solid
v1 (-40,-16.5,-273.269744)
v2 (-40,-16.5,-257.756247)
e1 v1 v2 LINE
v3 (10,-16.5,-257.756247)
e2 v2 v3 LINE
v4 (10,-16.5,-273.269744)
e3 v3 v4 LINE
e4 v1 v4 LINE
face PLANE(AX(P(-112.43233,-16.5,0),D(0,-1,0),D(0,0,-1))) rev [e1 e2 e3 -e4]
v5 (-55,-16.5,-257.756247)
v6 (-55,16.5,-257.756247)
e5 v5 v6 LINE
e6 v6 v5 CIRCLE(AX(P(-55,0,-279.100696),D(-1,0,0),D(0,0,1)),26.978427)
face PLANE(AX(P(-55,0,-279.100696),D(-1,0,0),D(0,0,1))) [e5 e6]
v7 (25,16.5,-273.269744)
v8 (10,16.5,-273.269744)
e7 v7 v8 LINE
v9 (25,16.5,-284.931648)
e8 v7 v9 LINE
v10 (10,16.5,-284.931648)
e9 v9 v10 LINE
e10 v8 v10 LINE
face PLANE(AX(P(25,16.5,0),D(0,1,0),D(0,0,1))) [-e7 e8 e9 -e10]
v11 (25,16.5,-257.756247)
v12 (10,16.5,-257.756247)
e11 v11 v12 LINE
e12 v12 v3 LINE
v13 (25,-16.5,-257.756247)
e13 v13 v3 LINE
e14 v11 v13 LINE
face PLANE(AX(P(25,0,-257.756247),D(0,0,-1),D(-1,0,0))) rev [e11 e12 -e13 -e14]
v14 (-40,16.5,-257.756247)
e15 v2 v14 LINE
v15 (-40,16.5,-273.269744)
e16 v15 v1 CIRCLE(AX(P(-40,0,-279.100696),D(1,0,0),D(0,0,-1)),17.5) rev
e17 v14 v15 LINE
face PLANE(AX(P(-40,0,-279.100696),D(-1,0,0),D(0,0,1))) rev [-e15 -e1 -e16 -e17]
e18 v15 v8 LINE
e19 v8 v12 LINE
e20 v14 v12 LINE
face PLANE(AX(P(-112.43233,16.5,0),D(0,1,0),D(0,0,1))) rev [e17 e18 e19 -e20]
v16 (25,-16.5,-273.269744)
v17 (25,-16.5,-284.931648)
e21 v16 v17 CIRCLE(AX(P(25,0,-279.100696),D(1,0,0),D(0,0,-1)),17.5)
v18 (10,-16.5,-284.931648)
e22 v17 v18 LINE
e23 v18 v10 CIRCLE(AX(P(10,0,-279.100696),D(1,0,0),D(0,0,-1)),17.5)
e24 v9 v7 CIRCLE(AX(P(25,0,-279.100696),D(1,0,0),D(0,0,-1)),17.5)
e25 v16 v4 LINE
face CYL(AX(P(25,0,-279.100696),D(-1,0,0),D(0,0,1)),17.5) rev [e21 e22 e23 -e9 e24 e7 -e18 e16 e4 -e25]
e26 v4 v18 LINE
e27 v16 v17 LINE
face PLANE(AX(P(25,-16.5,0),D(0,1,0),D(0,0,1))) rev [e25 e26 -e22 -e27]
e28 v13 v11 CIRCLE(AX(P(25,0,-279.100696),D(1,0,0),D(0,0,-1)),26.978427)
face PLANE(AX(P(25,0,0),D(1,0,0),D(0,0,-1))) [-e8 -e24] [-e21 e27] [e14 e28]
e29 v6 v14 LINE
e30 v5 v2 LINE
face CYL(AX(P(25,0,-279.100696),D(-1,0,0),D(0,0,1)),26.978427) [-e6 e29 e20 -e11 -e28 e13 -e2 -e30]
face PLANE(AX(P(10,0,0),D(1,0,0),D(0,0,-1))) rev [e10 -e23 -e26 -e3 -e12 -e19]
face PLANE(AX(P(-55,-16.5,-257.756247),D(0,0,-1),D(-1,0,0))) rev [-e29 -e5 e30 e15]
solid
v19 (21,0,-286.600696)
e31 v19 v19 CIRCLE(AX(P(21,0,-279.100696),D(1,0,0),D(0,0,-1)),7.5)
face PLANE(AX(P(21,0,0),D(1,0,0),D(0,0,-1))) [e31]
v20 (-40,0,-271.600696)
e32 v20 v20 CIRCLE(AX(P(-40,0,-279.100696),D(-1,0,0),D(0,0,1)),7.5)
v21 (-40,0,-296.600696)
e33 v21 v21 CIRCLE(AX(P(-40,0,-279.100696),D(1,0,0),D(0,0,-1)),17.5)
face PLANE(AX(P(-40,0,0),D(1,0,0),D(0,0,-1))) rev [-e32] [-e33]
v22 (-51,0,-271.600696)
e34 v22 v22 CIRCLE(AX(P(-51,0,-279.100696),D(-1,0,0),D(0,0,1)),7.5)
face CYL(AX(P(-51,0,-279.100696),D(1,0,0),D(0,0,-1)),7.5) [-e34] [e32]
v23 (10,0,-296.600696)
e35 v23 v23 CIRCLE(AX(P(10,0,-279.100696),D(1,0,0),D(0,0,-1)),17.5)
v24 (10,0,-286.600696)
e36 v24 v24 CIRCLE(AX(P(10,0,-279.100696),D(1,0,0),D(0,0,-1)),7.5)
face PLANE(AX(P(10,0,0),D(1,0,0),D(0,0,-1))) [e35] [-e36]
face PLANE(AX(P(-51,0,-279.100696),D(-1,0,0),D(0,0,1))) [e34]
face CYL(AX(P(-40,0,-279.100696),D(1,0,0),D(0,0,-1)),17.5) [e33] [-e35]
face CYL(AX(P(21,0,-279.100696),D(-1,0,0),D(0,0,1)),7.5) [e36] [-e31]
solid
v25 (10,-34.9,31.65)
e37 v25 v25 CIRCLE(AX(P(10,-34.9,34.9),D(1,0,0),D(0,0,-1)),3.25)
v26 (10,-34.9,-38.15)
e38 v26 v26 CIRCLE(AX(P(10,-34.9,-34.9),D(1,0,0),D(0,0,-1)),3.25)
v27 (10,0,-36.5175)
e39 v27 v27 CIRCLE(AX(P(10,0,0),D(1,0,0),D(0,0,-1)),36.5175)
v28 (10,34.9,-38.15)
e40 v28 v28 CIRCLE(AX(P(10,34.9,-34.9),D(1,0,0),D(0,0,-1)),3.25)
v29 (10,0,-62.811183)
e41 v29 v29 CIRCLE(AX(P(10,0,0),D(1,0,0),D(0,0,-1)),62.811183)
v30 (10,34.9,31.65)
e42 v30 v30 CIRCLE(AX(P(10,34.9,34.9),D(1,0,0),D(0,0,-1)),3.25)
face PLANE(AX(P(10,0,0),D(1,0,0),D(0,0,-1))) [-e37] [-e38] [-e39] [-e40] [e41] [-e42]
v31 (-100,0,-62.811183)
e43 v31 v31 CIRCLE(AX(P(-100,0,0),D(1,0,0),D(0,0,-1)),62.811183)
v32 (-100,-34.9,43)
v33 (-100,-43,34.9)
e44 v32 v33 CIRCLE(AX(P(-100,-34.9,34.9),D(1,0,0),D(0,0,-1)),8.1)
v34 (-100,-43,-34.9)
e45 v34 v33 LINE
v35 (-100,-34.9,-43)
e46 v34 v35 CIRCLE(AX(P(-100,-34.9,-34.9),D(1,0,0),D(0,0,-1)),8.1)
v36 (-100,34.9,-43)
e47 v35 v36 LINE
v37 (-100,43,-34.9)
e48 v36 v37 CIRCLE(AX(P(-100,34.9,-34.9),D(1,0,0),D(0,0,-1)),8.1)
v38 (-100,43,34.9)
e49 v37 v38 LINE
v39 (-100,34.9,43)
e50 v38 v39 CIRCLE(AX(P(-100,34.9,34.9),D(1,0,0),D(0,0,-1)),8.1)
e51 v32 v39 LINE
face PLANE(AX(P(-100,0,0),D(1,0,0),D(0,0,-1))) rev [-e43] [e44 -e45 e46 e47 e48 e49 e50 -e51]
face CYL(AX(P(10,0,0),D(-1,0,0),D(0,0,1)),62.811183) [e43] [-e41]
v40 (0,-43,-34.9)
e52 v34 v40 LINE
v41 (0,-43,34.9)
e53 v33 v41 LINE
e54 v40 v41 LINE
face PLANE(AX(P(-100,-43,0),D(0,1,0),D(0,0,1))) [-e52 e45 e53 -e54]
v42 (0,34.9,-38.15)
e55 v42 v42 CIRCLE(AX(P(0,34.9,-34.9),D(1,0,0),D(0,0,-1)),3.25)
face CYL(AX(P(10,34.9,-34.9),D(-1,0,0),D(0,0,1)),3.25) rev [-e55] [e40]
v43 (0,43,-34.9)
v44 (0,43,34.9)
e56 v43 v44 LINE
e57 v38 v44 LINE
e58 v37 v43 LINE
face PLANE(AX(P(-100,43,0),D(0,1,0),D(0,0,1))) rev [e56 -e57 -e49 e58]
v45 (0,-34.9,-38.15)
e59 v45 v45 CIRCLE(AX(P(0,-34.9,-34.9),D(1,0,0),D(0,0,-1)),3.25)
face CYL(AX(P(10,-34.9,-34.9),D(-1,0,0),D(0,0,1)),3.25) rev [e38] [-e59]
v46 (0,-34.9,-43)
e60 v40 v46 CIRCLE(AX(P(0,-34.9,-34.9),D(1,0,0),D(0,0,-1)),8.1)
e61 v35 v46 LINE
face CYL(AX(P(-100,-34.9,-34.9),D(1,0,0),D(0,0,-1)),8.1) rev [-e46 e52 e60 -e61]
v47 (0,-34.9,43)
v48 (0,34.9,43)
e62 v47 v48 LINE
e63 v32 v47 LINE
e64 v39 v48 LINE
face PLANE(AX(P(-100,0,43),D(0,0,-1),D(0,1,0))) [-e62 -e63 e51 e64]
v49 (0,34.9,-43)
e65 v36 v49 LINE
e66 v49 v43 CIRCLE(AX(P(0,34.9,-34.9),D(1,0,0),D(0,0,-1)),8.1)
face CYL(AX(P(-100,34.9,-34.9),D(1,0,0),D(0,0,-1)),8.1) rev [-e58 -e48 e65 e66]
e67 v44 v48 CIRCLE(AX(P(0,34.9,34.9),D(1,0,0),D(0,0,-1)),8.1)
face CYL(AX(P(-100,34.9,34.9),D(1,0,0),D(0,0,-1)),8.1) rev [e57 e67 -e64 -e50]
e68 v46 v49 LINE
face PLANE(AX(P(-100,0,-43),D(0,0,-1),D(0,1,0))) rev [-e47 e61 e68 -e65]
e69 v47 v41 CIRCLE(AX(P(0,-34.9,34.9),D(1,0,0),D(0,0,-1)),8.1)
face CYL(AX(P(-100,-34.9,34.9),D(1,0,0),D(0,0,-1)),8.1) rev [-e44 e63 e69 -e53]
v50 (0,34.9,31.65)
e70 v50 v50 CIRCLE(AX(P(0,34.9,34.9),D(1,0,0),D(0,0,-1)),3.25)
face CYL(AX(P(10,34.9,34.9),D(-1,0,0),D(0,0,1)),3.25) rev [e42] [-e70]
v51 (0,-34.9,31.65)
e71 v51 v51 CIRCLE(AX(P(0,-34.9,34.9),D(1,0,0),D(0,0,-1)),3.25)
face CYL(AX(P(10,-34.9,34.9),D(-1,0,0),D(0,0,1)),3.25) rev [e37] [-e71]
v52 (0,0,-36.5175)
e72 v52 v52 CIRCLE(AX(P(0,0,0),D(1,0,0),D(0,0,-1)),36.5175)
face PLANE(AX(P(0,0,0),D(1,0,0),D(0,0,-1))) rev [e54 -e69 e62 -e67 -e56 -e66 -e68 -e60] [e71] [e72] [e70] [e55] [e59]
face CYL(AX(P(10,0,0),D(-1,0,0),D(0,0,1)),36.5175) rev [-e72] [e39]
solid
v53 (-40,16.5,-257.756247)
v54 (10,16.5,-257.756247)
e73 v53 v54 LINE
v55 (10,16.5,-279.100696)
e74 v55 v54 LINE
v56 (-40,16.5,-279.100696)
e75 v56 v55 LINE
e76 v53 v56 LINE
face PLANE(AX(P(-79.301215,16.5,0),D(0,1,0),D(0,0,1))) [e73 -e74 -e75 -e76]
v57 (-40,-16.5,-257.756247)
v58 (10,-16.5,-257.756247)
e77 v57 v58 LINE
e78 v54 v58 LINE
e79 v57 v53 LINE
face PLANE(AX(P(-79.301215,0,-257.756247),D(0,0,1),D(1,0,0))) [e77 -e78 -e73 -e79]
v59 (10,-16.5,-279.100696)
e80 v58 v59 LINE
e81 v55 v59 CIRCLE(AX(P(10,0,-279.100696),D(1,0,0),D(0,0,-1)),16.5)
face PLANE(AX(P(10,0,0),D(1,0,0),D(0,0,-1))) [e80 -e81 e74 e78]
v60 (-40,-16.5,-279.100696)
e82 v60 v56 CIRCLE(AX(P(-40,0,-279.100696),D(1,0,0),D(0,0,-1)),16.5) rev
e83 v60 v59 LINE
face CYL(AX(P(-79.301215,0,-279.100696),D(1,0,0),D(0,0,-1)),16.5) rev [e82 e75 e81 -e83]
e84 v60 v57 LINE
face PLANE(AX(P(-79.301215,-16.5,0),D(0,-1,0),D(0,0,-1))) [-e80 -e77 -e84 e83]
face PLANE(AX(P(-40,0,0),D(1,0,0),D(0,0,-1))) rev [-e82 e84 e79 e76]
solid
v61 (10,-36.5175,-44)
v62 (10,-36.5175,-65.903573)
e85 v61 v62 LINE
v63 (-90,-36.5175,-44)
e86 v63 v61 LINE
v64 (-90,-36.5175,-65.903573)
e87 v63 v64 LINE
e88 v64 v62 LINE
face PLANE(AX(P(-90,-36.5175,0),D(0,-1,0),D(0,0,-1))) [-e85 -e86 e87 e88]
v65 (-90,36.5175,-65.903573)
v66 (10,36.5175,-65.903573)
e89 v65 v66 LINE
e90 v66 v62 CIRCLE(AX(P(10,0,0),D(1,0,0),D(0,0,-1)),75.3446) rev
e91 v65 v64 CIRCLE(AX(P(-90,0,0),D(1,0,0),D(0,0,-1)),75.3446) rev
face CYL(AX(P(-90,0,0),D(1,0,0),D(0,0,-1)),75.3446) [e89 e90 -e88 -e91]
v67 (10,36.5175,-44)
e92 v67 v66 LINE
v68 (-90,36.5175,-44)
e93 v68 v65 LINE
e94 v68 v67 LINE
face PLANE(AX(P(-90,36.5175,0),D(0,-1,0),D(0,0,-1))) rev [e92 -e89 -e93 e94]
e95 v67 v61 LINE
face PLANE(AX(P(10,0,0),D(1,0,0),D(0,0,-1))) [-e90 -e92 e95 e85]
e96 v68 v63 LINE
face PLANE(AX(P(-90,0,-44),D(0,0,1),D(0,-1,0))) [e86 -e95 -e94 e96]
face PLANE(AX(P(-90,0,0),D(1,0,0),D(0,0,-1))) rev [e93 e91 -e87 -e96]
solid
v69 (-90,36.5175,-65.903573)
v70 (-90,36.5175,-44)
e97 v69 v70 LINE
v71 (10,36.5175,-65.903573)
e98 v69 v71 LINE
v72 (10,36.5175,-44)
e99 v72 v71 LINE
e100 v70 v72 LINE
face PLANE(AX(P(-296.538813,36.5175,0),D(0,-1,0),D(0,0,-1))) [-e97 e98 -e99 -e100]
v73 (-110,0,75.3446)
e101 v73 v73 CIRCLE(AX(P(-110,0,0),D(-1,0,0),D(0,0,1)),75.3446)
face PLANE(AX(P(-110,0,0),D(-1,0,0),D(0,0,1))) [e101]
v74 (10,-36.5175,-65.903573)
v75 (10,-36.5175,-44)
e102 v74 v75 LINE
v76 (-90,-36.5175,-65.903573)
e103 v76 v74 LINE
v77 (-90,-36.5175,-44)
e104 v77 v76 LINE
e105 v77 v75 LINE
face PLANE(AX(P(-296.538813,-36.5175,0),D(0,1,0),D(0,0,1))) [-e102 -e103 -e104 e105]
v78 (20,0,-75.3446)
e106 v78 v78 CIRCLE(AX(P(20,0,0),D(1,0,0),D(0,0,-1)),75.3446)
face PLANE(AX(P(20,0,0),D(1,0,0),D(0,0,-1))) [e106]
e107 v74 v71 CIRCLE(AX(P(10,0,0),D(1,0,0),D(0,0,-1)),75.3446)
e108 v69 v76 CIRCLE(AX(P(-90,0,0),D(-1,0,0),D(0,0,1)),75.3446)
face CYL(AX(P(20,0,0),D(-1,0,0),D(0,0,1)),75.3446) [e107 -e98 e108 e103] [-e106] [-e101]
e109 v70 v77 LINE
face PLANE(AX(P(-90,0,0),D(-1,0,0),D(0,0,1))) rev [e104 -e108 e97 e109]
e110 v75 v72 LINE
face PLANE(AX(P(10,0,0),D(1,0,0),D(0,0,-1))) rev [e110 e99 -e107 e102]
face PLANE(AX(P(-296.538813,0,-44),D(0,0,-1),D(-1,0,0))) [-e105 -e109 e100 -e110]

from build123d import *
from build123d.topology import SkipClean

# Parameters (mm, degrees)
SKETCH1_R            = 62.811183182
SKETCH1_R_2          = 3.25
SKETCH1_R_3          = 36.5175
BOSS_EXTRUDE1_DEPTH  = 10
BOSS_EXTRUDE2_START  = -100
SKETCH1_3_R          = 62.811183182
BOSS_EXTRUDE2_DEPTH  = 100
BOSS_EXTRUDE3_DEPTH  = 100
SKETCH2_4_R          = 3.25
SKETCH2_4_R_2        = 36.5175
BOSS_EXTRUDE4_DEPTH  = 10
BOSS_EXTRUDE5_DEPTH  = 100
SKETCH4_R            = 75.344599786
BOSS_EXTRUDE6_DEPTH  = 20
SKETCH5_R            = 7.5
BOSS_EXTRUDE7_DEPTH  = 11
SKETCH5_3_R          = 17.5
SKETCH5_3_R_2        = 7.5
BOSS_EXTRUDE8_DEPTH  = 50
SKETCH6_R            = 7.5
BOSS_EXTRUDE9_DEPTH  = 11
BOSS_EXTRUDE10_DEPTH = 50
BOSS_EXTRUDE11_DEPTH = 15
BOSS_EXTRUDE12_DEPTH = 50
BOSS_EXTRUDE13_DEPTH = 15


# Read off the part's stored shape, not the designer's step: Boss-Extrude11
with BuildPart() as part:
    # Sketch1 → Boss-Extrude1 (new body)
    # profile 1 of 2: a face of its own
    with BuildSketch(Plane(origin=(0, 0, 0), x_dir=(0, 0, -1), z_dir=(1, 0, 0))):
        Circle(SKETCH1_R)
        with BuildLine():
            ThreePointArc((43, 34.9), (40.627564928, 40.627564928), (34.9, 43))
            Line((34.9, 43), (-34.9, 43))
            ThreePointArc((-34.9, 43), (-40.627564928, 40.627564928), (-43, 34.9))
            Line((-43, 34.9), (-43, -34.9))
            ThreePointArc((-43, -34.9), (-40.627564928, -40.627564928), (-34.9, -43))
            Line((-34.9, -43), (34.9, -43))
            ThreePointArc((34.9, -43), (40.627564928, -40.627564928), (43, -34.9))
            Line((43, -34.9), (43, 34.9))
        make_face(mode=Mode.SUBTRACT)
    # profile 2 of 2: a face of its own
    with BuildSketch(Plane(origin=(0, 0, 0), x_dir=(0, 0, -1), z_dir=(1, 0, 0))):
        with BuildLine():
            Line((43, -34.9), (43, 34.9))
            ThreePointArc((43, 34.9), (40.627564928, 40.627564928), (34.9, 43))
            Line((34.9, 43), (-34.9, 43))
            ThreePointArc((-34.9, 43), (-40.627564928, 40.627564928), (-43, 34.9))
            Line((-43, 34.9), (-43, -34.9))
            ThreePointArc((-43, -34.9), (-40.627564928, -40.627564928), (-34.9, -43))
            Line((-34.9, -43), (34.9, -43))
            ThreePointArc((34.9, -43), (40.627564928, -40.627564928), (43, -34.9))
        make_face()
        with Locations((-34.9, -34.9)):
            Circle(SKETCH1_R_2, mode=Mode.SUBTRACT)
        with Locations((34.9, -34.9)):
            Circle(SKETCH1_R_2, mode=Mode.SUBTRACT)
        with Locations((34.9, 34.9)):
            Circle(SKETCH1_R_2, mode=Mode.SUBTRACT)
        with Locations((-34.9, 34.9)):
            Circle(SKETCH1_R_2, mode=Mode.SUBTRACT)
        Circle(SKETCH1_R_3, mode=Mode.SUBTRACT)
    extrude(amount=BOSS_EXTRUDE1_DEPTH)

    # Sketch1<3> → Boss-Extrude2 (add)
    with BuildSketch(Plane(origin=(0, 0, 0), x_dir=(0, 0, -1), z_dir=(1, 0, 0)).offset(BOSS_EXTRUDE2_START)):
        Circle(SKETCH1_3_R)
        with BuildLine():
            ThreePointArc((43, 34.9), (40.627564928, 40.627564928), (34.9, 43))
            Line((34.9, 43), (-34.9, 43))
            ThreePointArc((-34.9, 43), (-40.627564928, 40.627564928), (-43, 34.9))
            Line((-43, 34.9), (-43, -34.9))
            ThreePointArc((-43, -34.9), (-40.627564928, -40.627564928), (-34.9, -43))
            Line((-34.9, -43), (34.9, -43))
            ThreePointArc((34.9, -43), (40.627564928, -40.627564928), (43, -34.9))
            Line((43, -34.9), (43, 34.9))
        make_face(mode=Mode.SUBTRACT)
    extrude(amount=BOSS_EXTRUDE2_DEPTH)


with BuildPart() as body_2:
    # Sketch2 → Boss-Extrude3 (new body)
    with BuildSketch(Plane(origin=(10, 0, 0), x_dir=(0, 0, -1), z_dir=(1, 0, 0))):
        with BuildLine():
            Line((44, 36.5175), (44, -36.5175))
            Line((44, -36.5175), (65.903572821, -36.5175))
            ThreePointArc((65.903572821, -36.5175), (75.344599786, 0), (65.903572821, 36.5175))
            Line((65.903572821, 36.5175), (44, 36.5175))
        make_face()
    extrude(amount=-BOSS_EXTRUDE3_DEPTH)


with BuildPart() as body_3:
    # Sketch2<4> → Boss-Extrude4 (new body)
    # profile 1 of 9: a face of its own
    with BuildSketch(Plane(origin=(10, 0, 0), x_dir=(0, 0, -1), z_dir=(1, 0, 0))):
        with BuildLine():
            Line((44, -36.5175), (44, 36.5175))
            Line((44, 36.5175), (51.104959901, 36.5175))
            ThreePointArc((51.104959901, 36.5175), (-62.811183182, 0), (51.104959901, -36.5175))
            Line((51.104959901, -36.5175), (44, -36.5175))
        make_face()
        with Locations((-34.9, -34.9)):
            Circle(SKETCH2_4_R, mode=Mode.SUBTRACT)
        with Locations((34.9, -34.9)):
            Circle(SKETCH2_4_R, mode=Mode.SUBTRACT)
        Circle(SKETCH2_4_R_2, mode=Mode.SUBTRACT)
        with Locations((-34.9, 34.9)):
            Circle(SKETCH2_4_R, mode=Mode.SUBTRACT)
        with Locations((34.9, 34.9)):
            Circle(SKETCH2_4_R, mode=Mode.SUBTRACT)
    # profile 2 of 9: a face of its own
    with BuildSketch(Plane(origin=(10, 0, 0), x_dir=(0, 0, -1), z_dir=(1, 0, 0))):
        with Locations((34.9, 34.9)):
            Circle(SKETCH2_4_R)
    # profile 3 of 9: a face of its own
    with BuildSketch(Plane(origin=(10, 0, 0), x_dir=(0, 0, -1), z_dir=(1, 0, 0))):
        with Locations((34.9, -34.9)):
            Circle(SKETCH2_4_R)
    # profile 4 of 9: a face of its own
    with BuildSketch(Plane(origin=(10, 0, 0), x_dir=(0, 0, -1), z_dir=(1, 0, 0))):
        with Locations((-34.9, -34.9)):
            Circle(SKETCH2_4_R)
    # profile 5 of 9: a face of its own
    with BuildSketch(Plane(origin=(10, 0, 0), x_dir=(0, 0, -1), z_dir=(1, 0, 0))):
        with Locations((-34.9, 34.9)):
            Circle(SKETCH2_4_R)
    # profile 6 of 9: a face of its own
    with BuildSketch(Plane(origin=(10, 0, 0), x_dir=(0, 0, -1), z_dir=(1, 0, 0))):
        Circle(SKETCH2_4_R_2)
    # profile 7 of 9: a face of its own
    with BuildSketch(Plane(origin=(10, 0, 0), x_dir=(0, 0, -1), z_dir=(1, 0, 0))):
        with BuildLine():
            Line((51.104959901, 36.5175), (44, 36.5175))
            Line((44, 36.5175), (44, -36.5175))
            Line((44, -36.5175), (51.104959901, -36.5175))
            ThreePointArc((51.104959901, -36.5175), (59.813074367, -19.173963269), (62.811183182, 0))
            ThreePointArc((62.811183182, 0), (59.813074367, 19.173963269), (51.104959901, 36.5175))
        make_face()
    # profile 8 of 9: a face of its own
    with BuildSketch(Plane(origin=(10, 0, 0), x_dir=(0, 0, -1), z_dir=(1, 0, 0))):
        with BuildLine():
            Line((65.903572821, 36.5175), (51.104959901, 36.5175))
            ThreePointArc((51.104959901, 36.5175), (59.813074367, 19.173963269), (62.811183182, 0))
            ThreePointArc((62.811183182, 0), (59.813074367, -19.173963269), (51.104959901, -36.5175))
            Line((51.104959901, -36.5175), (65.903572821, -36.5175))
            ThreePointArc((65.903572821, -36.5175), (75.344599786, 0), (65.903572821, 36.5175))
        make_face()
    # profile 9 of 9: a face of its own
    with BuildSketch(Plane(origin=(10, 0, 0), x_dir=(0, 0, -1), z_dir=(1, 0, 0))):
        with BuildLine():
            ThreePointArc((51.104959901, -36.5175), (-62.811183182, 0), (51.104959901, 36.5175))
            Line((51.104959901, 36.5175), (65.903572821, 36.5175))
            ThreePointArc((65.903572821, 36.5175), (-75.344599786, 0), (65.903572821, -36.5175))
            Line((65.903572821, -36.5175), (51.104959901, -36.5175))
        make_face()
    extrude(amount=BOSS_EXTRUDE4_DEPTH)

    # Sketch3 → Boss-Extrude5 (add)
    with BuildSketch(Plane.ZY.offset(-10)):
        with BuildLine():
            ThreePointArc((-65.903572821, -36.5175), (75.344599786, 0), (-65.903572821, 36.5175))
            Line((-65.903572821, 36.5175), (-44, 36.5175))
            Line((-44, 36.5175), (-44, -36.5175))
            Line((-44, -36.5175), (-65.903572821, -36.5175))
        make_face()
    extrude(amount=BOSS_EXTRUDE5_DEPTH)

    # Sketch4 → Boss-Extrude6 (add)
    with SkipClean():  # the faces are left unmerged after this step: merging them gives an invalid solid
        with BuildSketch(Plane.ZY.offset(90)):
            Circle(SKETCH4_R)
        extrude(amount=BOSS_EXTRUDE6_DEPTH)


with BuildPart() as body_4:
    # Sketch5 → Boss-Extrude7 (new body)
    with BuildSketch(Plane(origin=(10, 0, 0), x_dir=(0, 0, -1), z_dir=(1, 0, 0))):
        with Locations((279.100696087, 0)):
            Circle(SKETCH5_R)
    extrude(amount=BOSS_EXTRUDE7_DEPTH)

    # Sketch5<3> → Boss-Extrude8 (add)
    # profile 1 of 2: a face of its own
    with BuildSketch(Plane(origin=(10, 0, 0), x_dir=(0, 0, -1), z_dir=(1, 0, 0))):
        with Locations((279.100696087, 0)):
            Circle(SKETCH5_3_R)
        with Locations((279.100696087, 0)):
            Circle(SKETCH5_3_R_2, mode=Mode.SUBTRACT)
    # profile 2 of 2: a face of its own
    with BuildSketch(Plane(origin=(10, 0, 0), x_dir=(0, 0, -1), z_dir=(1, 0, 0))):
        with Locations((279.100696087, 0)):
            Circle(SKETCH5_3_R_2)
    extrude(amount=-BOSS_EXTRUDE8_DEPTH)

    # Sketch6 → Boss-Extrude9 (add)
    with BuildSketch(Plane.ZY.offset(40)):
        with Locations(Location((-279.100696087, 0, 0), (0, 0, 180))):
            Circle(SKETCH6_R)
    extrude(amount=BOSS_EXTRUDE9_DEPTH)


with BuildPart() as body_5:
    # Sketch7 → Boss-Extrude10 (new body)
    with BuildSketch(Plane(origin=(10, 0, 0), x_dir=(0, 0, -1), z_dir=(1, 0, 0))):
        with BuildLine():
            ThreePointArc((279.100696087, -16.5), (262.600696087, 0), (279.100696087, 16.5))
            Line((279.100696087, 16.5), (257.756246675, 16.5))
            Line((257.756246675, 16.5), (257.756246675, -16.5))
            Line((257.756246675, -16.5), (279.100696087, -16.5))
        make_face()
    extrude(amount=-BOSS_EXTRUDE10_DEPTH)


with BuildPart() as body_6:
    # Boss-Extrude11 outline → Boss-Extrude11 (new body)
    with BuildSketch(Plane(origin=(10, 0, 0), x_dir=(0, 0, -1), z_dir=(1, 0, 0))):
        with BuildLine():
            Line((257.756246675, 16.5), (257.756246675, -16.5))
            ThreePointArc((257.756246675, -16.5), (306.079123037, 0), (257.756246675, 16.5))
        make_face()
        with BuildLine():
            Line((273.269744192, -16.5), (284.931647982, -16.5))
            ThreePointArc((284.931647982, -16.5), (279.100696087, -17.5), (273.269744192, -16.5))
        make_face(mode=Mode.SUBTRACT)
        with BuildLine():
            ThreePointArc((273.269744192, 16.5), (279.100696087, 17.5), (284.931647982, 16.5))
            Line((284.931647982, 16.5), (273.269744192, 16.5))
        make_face(mode=Mode.SUBTRACT)
    extrude(amount=BOSS_EXTRUDE11_DEPTH)

    # Sketch7<4> → Boss-Extrude12 (add)
    with BuildSketch(Plane(origin=(10, 0, 0), x_dir=(0, 0, -1), z_dir=(1, 0, 0))):
        with BuildLine():
            ThreePointArc((273.269744192, 16.5), (279.100696087, 17.5), (284.931647982, 16.5))
            ThreePointArc((284.931647982, 16.5), (293.388657071, 10.104660851), (296.600696087, 0))
            ThreePointArc((296.600696087, 0), (293.388657071, -10.104660851), (284.931647982, -16.5))
            ThreePointArc((284.931647982, -16.5), (279.100696087, -17.5), (273.269744192, -16.5))
            Line((273.269744192, -16.5), (257.756246675, -16.5))
            ThreePointArc((257.756246675, -16.5), (306.079123037, 0), (257.756246675, 16.5))
            Line((257.756246675, 16.5), (273.269744192, 16.5))
        make_face()
    extrude(amount=-BOSS_EXTRUDE12_DEPTH)

    # Sketch8 → Boss-Extrude13 (add)
    with BuildSketch(Plane.ZY.offset(40)):
        with BuildLine():
            Line((-257.756246675, -16.5), (-257.756246675, 16.5))
            ThreePointArc((-257.756246675, 16.5), (-306.079123037, 0), (-257.756246675, -16.5))
        make_face()
    extrude(amount=BOSS_EXTRUDE13_DEPTH)


solid = Compound([part.part, body_2.part, body_3.part, body_4.part, body_5.part, body_6.part])
